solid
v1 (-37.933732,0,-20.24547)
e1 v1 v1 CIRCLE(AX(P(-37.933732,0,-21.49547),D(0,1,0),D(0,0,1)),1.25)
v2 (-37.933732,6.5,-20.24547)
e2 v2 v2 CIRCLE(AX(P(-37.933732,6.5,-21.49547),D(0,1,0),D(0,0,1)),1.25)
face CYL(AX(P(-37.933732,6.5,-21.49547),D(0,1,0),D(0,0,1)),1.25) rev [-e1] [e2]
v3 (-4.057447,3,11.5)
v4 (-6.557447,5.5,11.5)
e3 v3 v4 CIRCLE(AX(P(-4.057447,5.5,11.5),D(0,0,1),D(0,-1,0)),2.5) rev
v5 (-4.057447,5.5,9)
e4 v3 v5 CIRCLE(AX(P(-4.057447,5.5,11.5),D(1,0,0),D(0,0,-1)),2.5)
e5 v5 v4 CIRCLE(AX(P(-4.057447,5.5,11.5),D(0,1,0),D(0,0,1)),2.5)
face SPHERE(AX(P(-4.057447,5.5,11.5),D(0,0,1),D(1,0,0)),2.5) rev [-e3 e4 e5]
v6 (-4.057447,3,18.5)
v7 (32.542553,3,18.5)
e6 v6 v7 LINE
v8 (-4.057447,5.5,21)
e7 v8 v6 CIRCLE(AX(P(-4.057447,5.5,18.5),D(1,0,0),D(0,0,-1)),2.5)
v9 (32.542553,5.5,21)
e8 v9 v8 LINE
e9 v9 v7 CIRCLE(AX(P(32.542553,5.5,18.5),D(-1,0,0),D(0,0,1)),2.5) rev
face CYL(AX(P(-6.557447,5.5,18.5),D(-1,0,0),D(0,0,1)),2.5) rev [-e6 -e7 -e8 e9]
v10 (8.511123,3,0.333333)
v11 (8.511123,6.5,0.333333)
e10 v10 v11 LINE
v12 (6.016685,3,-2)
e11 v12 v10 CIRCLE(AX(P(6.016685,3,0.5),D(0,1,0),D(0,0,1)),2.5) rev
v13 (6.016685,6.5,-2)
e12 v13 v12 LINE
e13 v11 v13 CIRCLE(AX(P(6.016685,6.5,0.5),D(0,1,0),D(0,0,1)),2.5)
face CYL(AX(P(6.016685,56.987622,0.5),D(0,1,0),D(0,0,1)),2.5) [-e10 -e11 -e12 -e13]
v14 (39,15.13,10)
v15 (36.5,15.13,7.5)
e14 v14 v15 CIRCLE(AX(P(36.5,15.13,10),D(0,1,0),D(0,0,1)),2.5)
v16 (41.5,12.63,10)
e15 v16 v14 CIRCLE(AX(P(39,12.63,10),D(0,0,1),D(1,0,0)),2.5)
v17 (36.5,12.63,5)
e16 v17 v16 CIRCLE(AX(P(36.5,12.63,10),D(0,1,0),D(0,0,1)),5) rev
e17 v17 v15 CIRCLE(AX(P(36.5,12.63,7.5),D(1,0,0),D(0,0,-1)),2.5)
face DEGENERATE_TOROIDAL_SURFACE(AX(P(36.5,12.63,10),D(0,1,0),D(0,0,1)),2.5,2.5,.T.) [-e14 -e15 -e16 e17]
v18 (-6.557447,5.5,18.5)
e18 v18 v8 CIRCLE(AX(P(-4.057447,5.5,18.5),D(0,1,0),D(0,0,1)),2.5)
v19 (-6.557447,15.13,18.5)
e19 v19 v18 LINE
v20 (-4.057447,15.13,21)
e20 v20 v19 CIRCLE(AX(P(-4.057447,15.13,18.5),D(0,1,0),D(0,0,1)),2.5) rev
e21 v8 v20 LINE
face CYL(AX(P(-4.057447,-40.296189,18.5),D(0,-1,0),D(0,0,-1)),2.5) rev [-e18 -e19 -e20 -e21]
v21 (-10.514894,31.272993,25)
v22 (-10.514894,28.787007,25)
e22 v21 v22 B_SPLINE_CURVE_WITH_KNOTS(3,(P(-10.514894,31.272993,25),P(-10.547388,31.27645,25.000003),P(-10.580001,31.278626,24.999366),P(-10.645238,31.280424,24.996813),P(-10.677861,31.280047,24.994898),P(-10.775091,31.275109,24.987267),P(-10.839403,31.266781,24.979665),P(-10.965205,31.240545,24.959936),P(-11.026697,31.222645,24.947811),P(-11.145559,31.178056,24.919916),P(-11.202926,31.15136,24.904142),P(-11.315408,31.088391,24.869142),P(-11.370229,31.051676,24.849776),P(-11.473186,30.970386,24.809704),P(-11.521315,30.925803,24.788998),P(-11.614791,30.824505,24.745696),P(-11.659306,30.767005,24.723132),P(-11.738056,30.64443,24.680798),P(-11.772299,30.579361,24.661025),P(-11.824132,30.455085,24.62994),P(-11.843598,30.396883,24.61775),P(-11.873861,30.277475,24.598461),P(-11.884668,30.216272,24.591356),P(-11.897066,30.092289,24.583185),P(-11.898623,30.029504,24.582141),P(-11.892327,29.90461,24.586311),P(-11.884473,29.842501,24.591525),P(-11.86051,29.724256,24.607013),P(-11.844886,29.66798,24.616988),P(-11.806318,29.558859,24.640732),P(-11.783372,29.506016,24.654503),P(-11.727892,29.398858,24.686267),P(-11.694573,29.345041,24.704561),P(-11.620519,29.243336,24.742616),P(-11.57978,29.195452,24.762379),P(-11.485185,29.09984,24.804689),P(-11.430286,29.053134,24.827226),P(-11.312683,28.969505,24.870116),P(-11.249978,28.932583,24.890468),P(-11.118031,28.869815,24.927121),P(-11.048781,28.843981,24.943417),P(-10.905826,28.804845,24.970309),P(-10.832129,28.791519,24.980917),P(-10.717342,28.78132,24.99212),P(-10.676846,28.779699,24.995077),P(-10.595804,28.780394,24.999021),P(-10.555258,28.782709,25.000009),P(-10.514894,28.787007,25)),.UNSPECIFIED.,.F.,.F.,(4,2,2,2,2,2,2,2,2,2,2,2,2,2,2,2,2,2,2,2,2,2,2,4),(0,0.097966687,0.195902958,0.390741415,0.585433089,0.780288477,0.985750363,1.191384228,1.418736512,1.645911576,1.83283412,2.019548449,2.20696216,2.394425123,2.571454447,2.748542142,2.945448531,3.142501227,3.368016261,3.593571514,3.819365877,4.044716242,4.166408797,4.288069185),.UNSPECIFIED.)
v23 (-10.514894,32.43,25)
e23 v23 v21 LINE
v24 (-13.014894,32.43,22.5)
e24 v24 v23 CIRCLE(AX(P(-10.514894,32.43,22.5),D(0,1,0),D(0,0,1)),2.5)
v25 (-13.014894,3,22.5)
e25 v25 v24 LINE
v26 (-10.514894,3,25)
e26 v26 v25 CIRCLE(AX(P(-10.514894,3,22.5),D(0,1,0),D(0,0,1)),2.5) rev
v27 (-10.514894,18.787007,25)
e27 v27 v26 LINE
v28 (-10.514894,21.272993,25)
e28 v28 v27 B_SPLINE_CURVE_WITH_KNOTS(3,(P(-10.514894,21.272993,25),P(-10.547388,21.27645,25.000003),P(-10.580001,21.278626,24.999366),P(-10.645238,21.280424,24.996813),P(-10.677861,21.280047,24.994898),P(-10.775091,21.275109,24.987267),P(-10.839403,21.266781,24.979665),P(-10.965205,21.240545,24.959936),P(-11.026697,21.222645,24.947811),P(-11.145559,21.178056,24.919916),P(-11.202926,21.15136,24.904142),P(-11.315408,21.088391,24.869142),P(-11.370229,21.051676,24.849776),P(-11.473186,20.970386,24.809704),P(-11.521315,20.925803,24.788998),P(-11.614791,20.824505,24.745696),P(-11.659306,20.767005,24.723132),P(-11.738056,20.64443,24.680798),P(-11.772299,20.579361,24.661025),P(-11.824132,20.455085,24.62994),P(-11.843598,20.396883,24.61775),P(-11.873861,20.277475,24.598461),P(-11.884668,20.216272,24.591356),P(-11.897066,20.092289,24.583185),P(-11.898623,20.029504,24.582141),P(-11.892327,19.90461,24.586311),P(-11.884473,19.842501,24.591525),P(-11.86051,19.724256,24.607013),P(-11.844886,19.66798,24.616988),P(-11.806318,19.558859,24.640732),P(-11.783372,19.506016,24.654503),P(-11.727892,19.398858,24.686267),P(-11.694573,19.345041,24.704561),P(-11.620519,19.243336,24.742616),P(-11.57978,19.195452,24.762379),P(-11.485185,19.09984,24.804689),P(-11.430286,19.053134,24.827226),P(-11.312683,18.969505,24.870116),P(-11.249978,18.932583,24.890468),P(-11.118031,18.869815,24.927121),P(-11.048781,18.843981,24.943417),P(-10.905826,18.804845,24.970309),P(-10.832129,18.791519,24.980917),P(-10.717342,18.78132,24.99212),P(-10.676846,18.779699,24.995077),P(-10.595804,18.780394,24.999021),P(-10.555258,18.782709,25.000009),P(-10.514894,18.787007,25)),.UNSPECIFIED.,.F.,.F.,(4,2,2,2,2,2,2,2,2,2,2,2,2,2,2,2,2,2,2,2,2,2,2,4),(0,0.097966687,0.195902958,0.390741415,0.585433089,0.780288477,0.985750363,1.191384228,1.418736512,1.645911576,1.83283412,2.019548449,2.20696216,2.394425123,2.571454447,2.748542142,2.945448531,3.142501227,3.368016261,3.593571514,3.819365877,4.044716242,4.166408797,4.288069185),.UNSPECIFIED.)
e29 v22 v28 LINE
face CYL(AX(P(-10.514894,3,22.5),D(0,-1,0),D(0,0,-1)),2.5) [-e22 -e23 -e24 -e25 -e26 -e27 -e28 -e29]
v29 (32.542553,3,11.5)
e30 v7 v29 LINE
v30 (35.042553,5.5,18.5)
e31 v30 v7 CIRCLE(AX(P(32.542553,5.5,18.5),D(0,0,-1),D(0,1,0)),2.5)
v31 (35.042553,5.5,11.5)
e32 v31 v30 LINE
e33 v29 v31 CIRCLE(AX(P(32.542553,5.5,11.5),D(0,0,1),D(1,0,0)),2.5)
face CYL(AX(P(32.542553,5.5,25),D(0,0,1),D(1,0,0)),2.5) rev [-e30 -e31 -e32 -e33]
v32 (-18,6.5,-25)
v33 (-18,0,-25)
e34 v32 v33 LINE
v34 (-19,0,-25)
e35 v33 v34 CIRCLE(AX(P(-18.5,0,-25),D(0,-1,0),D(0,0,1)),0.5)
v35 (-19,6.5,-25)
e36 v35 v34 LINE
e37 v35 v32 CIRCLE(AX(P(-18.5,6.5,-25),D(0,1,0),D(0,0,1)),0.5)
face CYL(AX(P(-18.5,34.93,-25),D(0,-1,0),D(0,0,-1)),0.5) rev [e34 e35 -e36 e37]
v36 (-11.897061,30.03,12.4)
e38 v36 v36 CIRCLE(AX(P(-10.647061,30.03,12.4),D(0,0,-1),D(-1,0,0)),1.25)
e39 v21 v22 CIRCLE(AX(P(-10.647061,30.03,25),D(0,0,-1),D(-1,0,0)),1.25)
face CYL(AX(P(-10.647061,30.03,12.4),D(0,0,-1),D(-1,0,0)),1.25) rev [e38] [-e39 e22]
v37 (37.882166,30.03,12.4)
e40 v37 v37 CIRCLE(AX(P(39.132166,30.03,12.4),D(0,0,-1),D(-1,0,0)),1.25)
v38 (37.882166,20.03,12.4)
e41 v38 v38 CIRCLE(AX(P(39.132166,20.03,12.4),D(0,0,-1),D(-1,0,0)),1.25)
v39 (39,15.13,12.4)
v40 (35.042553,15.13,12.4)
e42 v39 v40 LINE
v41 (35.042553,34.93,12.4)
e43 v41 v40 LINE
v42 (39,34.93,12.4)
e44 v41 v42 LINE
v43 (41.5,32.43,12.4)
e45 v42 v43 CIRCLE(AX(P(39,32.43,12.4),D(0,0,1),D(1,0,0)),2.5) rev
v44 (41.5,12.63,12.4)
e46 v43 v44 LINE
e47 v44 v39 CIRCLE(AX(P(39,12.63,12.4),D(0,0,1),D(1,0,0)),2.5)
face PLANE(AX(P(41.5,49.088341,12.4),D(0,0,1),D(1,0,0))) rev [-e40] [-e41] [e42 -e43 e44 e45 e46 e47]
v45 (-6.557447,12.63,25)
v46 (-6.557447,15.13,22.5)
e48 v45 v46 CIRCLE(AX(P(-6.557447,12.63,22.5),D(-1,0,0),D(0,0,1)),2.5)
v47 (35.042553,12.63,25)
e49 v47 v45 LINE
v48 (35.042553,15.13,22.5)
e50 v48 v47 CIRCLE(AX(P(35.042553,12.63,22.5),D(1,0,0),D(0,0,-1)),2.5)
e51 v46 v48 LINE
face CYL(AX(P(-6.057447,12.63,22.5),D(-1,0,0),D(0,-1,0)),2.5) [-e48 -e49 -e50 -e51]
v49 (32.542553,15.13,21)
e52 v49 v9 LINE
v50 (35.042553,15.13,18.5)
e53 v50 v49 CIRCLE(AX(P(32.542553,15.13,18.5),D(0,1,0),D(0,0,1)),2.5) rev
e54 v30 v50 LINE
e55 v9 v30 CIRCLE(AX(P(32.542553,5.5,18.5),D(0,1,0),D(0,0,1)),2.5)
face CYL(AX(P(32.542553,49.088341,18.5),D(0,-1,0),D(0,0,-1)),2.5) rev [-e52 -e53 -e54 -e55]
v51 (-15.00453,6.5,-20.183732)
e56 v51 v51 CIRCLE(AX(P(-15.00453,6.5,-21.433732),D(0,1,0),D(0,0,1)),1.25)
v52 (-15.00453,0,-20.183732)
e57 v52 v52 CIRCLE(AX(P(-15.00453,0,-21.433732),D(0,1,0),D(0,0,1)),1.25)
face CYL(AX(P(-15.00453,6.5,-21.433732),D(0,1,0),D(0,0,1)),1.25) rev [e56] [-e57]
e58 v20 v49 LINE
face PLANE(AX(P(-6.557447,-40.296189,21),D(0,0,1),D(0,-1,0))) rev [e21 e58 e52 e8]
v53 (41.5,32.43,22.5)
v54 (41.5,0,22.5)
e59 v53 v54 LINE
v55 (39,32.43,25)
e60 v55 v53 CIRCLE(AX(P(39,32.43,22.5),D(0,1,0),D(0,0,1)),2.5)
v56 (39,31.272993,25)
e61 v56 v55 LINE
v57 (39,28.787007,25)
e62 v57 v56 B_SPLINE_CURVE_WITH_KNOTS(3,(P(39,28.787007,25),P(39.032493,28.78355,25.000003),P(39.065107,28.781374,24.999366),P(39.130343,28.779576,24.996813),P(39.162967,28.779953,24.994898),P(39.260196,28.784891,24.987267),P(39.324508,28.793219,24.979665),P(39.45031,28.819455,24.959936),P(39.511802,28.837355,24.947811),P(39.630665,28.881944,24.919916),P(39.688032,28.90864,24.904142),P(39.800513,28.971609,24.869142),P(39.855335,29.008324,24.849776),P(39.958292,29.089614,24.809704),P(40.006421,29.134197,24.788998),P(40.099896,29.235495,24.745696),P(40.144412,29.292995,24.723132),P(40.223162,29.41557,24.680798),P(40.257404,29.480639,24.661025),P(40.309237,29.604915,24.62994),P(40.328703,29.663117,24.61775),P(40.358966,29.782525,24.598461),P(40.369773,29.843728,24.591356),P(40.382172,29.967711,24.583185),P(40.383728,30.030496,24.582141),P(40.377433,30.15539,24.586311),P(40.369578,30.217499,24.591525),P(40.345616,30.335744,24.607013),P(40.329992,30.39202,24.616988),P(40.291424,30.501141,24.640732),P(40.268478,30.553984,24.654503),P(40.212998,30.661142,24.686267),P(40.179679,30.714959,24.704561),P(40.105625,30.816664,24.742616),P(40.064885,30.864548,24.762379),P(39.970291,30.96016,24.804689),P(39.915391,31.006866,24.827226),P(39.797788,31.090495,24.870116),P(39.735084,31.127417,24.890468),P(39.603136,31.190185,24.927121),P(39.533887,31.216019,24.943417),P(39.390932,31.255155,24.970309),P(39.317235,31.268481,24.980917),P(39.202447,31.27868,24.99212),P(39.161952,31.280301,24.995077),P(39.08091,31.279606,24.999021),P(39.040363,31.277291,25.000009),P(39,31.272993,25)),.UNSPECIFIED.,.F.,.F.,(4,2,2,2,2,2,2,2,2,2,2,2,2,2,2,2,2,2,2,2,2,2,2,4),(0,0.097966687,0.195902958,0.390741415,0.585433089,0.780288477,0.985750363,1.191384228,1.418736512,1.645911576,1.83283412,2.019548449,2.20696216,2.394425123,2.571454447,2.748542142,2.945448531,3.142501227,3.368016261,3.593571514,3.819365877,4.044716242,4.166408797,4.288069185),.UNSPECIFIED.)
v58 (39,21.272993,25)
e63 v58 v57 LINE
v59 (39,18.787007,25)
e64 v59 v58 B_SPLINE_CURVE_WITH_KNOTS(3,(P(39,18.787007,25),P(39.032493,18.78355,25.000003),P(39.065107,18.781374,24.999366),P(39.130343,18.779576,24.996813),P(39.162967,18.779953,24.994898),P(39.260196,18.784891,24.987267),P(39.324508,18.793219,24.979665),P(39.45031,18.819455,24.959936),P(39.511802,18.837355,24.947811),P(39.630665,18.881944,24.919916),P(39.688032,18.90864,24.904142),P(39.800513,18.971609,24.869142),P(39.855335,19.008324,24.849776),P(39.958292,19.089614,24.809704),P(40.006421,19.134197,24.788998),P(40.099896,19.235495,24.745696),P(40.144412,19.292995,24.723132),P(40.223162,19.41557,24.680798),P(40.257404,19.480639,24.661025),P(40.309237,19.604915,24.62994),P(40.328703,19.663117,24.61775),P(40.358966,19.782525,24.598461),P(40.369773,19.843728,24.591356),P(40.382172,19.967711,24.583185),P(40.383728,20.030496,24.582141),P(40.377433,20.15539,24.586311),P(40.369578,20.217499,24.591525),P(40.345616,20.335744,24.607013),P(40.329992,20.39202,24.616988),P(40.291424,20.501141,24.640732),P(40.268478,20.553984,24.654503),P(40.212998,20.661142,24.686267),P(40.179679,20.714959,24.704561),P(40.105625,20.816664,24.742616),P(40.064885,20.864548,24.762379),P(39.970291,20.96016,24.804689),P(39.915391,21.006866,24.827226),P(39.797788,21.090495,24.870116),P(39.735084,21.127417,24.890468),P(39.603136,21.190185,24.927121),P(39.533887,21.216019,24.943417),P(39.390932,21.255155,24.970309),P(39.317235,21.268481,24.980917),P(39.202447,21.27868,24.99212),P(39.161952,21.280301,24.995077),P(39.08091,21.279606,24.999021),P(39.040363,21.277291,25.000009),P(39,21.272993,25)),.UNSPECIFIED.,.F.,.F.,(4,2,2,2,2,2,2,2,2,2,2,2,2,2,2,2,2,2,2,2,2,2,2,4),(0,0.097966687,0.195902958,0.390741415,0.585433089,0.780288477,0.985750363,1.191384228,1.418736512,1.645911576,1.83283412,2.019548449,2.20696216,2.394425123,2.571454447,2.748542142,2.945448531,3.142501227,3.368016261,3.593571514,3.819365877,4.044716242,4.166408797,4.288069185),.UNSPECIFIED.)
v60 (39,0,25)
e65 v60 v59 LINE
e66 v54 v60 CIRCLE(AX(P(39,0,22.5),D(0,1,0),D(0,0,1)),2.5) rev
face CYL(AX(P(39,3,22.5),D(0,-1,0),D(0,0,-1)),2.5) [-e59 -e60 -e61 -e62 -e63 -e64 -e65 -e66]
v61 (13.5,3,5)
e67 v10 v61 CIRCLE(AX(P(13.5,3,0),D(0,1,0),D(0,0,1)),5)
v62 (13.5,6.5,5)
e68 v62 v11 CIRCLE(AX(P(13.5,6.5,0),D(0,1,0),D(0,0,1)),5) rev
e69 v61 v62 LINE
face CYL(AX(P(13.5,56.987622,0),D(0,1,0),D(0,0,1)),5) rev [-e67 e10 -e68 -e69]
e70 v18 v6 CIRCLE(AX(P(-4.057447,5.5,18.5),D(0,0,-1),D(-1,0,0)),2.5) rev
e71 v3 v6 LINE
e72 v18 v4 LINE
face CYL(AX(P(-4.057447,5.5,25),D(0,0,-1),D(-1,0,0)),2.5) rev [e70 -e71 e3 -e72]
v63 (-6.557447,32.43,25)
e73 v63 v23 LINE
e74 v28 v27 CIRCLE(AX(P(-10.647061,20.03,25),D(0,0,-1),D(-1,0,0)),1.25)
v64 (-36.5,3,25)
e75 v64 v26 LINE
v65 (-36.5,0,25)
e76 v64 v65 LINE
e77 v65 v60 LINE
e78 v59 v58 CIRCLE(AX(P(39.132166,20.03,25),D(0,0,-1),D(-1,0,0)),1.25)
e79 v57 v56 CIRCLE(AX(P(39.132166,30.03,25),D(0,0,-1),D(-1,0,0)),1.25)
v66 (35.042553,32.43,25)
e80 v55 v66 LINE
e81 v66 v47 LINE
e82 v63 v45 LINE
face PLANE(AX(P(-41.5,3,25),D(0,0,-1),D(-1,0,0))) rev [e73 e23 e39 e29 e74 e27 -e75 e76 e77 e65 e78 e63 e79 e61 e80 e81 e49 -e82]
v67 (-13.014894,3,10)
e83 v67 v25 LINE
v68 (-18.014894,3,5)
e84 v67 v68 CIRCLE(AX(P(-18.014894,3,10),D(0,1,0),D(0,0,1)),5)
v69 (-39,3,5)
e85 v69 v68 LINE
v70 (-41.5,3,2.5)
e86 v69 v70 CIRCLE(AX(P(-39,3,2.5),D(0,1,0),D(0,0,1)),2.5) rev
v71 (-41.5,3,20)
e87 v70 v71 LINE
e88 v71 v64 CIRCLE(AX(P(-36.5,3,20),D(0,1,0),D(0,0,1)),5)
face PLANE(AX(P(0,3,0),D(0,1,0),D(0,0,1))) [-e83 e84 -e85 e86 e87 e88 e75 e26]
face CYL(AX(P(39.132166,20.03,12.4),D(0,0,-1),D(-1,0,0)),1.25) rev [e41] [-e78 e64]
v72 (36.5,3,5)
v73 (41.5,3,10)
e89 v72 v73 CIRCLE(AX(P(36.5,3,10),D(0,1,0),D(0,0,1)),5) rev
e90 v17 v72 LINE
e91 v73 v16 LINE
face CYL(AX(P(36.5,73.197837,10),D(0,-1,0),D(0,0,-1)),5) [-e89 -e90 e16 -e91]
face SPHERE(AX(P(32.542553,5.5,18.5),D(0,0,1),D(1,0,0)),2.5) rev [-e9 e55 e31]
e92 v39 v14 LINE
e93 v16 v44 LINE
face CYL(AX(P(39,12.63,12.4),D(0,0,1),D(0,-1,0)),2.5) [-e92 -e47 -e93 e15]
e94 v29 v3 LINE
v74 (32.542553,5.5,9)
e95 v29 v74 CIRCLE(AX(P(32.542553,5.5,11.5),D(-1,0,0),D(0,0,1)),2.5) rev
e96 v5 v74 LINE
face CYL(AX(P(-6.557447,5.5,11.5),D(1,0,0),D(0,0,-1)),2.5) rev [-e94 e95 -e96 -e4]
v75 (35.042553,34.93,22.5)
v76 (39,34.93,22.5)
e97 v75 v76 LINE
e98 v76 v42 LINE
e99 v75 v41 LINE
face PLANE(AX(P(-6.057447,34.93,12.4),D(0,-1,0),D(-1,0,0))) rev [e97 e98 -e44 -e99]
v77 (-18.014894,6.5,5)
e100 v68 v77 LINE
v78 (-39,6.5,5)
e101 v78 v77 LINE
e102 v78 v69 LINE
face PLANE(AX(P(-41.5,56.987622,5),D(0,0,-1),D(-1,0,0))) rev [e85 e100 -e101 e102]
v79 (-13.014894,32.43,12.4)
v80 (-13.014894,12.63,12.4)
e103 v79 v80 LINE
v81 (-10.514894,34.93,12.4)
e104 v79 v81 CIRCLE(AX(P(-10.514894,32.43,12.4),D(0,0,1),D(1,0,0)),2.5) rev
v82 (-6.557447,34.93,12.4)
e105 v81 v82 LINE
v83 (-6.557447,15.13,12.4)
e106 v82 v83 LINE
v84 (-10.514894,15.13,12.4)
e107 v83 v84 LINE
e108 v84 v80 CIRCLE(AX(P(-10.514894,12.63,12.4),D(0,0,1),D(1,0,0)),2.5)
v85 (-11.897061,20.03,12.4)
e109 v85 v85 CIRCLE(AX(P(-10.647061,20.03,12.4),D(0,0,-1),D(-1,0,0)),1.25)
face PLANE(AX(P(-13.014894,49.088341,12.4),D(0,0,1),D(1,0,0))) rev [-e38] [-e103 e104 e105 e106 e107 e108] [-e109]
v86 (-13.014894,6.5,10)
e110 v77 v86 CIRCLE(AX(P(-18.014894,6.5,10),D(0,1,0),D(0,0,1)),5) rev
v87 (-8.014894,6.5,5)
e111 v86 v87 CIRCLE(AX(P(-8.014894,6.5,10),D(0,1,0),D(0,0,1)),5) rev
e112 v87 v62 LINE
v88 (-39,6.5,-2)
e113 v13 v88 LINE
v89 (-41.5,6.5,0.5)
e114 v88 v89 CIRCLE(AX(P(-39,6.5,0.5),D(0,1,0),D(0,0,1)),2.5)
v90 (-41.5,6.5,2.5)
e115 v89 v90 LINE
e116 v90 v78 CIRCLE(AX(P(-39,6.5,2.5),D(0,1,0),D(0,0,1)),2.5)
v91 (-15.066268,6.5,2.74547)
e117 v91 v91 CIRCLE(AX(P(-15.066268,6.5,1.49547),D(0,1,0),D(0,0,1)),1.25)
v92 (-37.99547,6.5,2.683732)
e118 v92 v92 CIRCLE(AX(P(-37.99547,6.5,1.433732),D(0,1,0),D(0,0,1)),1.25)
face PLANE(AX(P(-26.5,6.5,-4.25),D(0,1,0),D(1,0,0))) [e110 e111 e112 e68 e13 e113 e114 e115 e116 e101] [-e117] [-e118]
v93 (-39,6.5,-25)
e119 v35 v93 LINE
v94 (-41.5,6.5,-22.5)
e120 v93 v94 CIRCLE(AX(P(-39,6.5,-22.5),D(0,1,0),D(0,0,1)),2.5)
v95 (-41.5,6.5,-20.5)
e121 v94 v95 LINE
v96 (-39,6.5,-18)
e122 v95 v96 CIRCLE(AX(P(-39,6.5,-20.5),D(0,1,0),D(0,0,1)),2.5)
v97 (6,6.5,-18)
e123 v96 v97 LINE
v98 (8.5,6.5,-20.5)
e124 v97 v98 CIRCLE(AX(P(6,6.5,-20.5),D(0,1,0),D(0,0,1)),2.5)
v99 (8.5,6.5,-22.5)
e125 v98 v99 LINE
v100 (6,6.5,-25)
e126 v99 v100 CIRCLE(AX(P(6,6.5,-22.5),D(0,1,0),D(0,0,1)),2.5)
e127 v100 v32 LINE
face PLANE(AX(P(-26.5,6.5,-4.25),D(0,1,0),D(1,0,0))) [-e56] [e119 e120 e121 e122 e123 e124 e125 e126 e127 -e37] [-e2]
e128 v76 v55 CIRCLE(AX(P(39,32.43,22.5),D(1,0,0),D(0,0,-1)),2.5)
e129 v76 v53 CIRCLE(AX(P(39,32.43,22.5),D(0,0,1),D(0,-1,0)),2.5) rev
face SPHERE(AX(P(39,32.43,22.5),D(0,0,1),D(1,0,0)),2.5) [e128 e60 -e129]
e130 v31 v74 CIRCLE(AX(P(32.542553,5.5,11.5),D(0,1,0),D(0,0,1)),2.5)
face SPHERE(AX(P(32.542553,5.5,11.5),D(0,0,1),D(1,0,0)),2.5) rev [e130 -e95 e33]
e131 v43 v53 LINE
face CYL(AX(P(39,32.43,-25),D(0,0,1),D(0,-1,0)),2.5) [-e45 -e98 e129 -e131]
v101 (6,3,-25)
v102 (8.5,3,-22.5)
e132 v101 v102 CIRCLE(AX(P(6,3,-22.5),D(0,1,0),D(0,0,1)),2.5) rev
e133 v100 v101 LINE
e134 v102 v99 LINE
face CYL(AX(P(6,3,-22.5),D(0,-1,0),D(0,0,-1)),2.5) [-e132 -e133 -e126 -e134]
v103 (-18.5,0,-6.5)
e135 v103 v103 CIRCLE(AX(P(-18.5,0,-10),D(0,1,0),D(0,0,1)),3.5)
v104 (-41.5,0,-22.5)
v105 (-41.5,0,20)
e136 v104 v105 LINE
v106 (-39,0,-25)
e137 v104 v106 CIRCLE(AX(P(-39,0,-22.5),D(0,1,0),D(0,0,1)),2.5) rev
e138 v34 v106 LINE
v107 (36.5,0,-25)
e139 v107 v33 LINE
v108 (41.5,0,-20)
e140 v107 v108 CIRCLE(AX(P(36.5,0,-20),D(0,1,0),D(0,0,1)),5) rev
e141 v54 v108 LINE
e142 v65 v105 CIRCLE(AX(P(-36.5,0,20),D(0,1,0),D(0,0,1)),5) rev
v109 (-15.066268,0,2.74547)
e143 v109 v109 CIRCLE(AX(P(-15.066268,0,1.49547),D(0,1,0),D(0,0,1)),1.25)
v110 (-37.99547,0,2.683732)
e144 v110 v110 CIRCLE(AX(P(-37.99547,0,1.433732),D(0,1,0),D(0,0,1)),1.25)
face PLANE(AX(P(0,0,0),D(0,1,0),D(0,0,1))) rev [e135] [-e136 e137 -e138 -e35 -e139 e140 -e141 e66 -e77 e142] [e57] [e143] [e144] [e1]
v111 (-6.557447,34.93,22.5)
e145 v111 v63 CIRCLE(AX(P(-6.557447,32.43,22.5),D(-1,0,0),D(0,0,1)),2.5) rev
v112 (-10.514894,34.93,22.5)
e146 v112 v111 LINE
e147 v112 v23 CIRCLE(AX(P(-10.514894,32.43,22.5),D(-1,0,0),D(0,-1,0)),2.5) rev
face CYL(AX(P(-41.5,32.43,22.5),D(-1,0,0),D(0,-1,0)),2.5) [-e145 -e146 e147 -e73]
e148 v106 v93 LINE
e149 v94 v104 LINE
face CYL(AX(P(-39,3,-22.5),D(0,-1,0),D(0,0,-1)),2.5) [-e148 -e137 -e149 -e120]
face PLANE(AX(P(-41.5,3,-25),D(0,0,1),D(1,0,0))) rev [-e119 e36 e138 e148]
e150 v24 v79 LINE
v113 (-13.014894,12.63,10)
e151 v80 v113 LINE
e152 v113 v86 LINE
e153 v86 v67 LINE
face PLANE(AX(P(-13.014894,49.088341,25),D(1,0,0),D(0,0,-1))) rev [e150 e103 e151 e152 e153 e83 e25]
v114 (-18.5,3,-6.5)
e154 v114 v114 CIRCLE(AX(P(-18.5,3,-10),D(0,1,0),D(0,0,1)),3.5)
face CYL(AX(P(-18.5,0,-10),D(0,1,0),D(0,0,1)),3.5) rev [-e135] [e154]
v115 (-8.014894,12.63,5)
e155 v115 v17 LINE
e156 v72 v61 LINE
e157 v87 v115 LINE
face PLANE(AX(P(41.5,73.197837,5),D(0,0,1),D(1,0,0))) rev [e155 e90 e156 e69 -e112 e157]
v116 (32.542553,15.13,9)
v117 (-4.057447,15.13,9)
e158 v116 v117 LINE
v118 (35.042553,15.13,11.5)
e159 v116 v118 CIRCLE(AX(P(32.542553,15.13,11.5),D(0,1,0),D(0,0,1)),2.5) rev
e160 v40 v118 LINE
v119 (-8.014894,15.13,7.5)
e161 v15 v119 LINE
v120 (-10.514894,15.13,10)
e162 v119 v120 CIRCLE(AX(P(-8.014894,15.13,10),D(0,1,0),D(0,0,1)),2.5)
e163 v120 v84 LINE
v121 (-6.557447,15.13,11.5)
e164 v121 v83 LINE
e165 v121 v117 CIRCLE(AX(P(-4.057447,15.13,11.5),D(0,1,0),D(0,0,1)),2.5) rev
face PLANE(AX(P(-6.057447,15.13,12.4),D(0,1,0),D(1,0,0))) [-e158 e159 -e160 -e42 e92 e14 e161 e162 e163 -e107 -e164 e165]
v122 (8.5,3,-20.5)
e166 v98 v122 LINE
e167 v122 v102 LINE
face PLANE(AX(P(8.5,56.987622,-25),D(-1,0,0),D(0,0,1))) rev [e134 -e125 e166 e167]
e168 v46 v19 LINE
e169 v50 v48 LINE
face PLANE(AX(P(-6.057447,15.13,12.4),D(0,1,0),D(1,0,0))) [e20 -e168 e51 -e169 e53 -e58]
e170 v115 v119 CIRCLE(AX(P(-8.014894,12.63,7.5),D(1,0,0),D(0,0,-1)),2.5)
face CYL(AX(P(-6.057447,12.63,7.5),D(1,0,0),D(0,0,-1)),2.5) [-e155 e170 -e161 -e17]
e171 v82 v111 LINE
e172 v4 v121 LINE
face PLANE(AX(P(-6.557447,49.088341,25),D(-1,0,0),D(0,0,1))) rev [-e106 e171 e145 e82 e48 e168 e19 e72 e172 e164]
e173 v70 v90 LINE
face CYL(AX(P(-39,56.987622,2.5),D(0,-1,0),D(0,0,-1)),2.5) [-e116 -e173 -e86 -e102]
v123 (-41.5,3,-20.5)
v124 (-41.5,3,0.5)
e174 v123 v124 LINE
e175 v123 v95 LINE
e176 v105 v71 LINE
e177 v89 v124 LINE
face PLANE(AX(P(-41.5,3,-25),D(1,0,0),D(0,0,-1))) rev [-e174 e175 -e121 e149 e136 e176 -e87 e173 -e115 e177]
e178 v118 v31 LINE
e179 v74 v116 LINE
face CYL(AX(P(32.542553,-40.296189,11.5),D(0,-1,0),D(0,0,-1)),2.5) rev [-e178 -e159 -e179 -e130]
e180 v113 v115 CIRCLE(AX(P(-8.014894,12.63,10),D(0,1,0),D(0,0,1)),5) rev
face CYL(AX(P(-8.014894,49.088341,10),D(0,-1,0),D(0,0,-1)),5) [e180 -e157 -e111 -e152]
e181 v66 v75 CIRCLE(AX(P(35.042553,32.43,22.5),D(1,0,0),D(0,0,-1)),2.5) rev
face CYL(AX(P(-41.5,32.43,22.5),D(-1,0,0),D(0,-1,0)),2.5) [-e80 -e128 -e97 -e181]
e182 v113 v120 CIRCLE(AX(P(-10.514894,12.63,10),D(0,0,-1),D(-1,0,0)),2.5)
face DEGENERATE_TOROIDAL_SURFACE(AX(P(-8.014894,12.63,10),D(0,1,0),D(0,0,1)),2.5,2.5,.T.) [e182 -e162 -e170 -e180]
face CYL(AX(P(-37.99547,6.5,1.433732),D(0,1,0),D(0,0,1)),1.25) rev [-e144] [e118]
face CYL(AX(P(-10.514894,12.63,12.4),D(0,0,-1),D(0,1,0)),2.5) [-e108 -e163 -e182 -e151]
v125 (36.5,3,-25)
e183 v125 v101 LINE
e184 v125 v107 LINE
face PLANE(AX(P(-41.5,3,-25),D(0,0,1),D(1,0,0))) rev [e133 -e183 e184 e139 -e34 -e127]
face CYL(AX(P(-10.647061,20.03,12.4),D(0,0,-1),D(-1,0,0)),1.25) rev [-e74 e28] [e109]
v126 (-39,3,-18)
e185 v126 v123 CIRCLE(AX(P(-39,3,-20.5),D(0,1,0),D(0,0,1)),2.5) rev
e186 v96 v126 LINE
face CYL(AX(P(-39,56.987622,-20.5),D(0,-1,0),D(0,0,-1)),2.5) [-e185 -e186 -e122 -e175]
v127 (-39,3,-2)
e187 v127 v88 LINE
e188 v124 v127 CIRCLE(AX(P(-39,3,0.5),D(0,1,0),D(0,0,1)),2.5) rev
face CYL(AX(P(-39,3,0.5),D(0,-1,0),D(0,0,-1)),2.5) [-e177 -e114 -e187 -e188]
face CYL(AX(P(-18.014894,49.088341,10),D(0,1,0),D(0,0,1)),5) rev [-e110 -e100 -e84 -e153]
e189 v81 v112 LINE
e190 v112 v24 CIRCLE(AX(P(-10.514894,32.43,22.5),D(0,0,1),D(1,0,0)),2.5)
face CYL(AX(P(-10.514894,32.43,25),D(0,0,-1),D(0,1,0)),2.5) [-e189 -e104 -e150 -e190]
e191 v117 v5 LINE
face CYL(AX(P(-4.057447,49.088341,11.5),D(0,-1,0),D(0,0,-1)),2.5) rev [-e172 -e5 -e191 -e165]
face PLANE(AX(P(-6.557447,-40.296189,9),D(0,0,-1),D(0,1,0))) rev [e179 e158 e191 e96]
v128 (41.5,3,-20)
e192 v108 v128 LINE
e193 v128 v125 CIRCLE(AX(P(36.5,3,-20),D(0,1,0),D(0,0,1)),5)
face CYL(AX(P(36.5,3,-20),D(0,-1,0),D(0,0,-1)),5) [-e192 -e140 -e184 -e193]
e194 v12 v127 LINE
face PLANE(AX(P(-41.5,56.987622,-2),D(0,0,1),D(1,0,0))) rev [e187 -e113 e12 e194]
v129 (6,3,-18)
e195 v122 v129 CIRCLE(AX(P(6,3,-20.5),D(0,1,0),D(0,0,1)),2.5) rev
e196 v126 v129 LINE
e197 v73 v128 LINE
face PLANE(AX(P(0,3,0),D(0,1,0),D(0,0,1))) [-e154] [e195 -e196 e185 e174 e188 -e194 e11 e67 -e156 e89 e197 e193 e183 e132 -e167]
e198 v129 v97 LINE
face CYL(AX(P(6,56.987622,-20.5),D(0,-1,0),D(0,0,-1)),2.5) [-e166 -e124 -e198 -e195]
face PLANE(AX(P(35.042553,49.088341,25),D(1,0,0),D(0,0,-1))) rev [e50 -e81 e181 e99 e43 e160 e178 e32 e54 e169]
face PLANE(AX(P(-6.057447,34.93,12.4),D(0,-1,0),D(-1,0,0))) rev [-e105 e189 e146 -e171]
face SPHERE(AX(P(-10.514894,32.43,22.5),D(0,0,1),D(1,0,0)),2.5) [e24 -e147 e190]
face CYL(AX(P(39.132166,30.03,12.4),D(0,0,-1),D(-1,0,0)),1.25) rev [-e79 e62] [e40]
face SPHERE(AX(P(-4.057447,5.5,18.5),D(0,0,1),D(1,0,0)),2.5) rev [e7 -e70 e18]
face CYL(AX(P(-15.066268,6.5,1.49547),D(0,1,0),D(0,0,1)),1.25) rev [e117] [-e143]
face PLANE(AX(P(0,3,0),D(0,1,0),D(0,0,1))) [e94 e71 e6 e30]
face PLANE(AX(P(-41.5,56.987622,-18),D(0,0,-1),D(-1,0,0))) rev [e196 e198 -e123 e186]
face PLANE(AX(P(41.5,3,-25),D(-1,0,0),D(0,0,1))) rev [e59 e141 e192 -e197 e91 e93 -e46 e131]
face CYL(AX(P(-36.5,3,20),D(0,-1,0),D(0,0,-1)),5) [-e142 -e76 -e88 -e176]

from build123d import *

# Parameters (mm, degrees)
SKETCH1_W             = 83
SKETCH1_H             = 50
BOSS_EXTRUDE1_DEPTH   = 3
SKETCH2_W             = 50
SKETCH2_H             = 7
BOSS_EXTRUDE2_DEPTH   = 3.5
SKETCH3_W             = 6.457447236
SKETCH3_H             = 12.6
BOSS_EXTRUDE3_DEPTH   = 31.93
M3X0_5_TAPPED_HOLE1_D = 2.5
SKETCH6_W             = 54.514894472
SKETCH6_H             = 20
BOSS_EXTRUDE4_DEPTH   = 12.13
SKETCH10_W            = 41.6
SKETCH10_H            = 12
CUT_EXTRUDE2_DEPTH    = 12.13
FILLET1_R             = 5
FILLET2_R             = 5
FILLET3_R             = 2.5
FILLET4_R             = 2.5
FILLET5_R             = 2.5
M3X0_5_TAPPED_HOLE2_D = 2.5
SKETCH9_R             = 3.5
CUT_EXTRUDE1_DEPTH    = 59.023916735
FILLET6_R             = 2.5
CUT_EXTRUDE3_DEPTH    = 60.727338073


with BuildPart() as part:
    # Sketch1 → Boss-Extrude1 (new body)
    with BuildSketch(Plane(origin=(0, 0, 0), x_dir=(1, 0, 0), z_dir=(0, 1, 0))):
        Rectangle(SKETCH1_W, SKETCH1_H)
    extrude(amount=BOSS_EXTRUDE1_DEPTH)

    # Sketch2 → Boss-Extrude2 (add)
    with BuildSketch(Plane(origin=(0, 3, 0), x_dir=(1, 0, 0), z_dir=(0, 1, 0))):
        with Locations((-16.5, 21.5)):
            Rectangle(SKETCH2_W, SKETCH2_H)
        with Locations((-16.5, -1.5)):
            Rectangle(SKETCH2_W, SKETCH2_H)
    extrude(amount=BOSS_EXTRUDE2_DEPTH)

    # Sketch3 → Boss-Extrude3 (add)
    with BuildSketch(Plane(origin=(0, 3, 0), x_dir=(1, 0, 0), z_dir=(0, 1, 0))):
        with Locations((38.271276382, -18.7)):
            Rectangle(SKETCH3_W, SKETCH3_H)
        with Locations((-9.786170854, -18.7)):
            Rectangle(SKETCH3_W, SKETCH3_H)
    extrude(amount=BOSS_EXTRUDE3_DEPTH)

    # M3x0.5 Tapped Hole1 (through all)
    with Locations(Plane(origin=(0, 0, 12.4), x_dir=(-1, 0, 0), z_dir=(0, 0, -1))):
        with Locations((-39.132166065, 30.03), (-39.132166065, 20.03), (10.647060537, 20.03), (10.647060537, 30.03)):
            Hole(M3X0_5_TAPPED_HOLE1_D / 2)

    # Sketch6 → Boss-Extrude4 (add)
    with BuildSketch(Plane(origin=(0, 3, 0), x_dir=(1, 0, 0), z_dir=(0, 1, 0))):
        with Locations((14.242552764, -15)):
            Rectangle(SKETCH6_W, SKETCH6_H)
    extrude(amount=BOSS_EXTRUDE4_DEPTH)

    # Sketch10 → Cut-Extrude2 (cut)
    with BuildSketch(Plane(origin=(0, 15.13, 0), x_dir=(1, 0, 0), z_dir=(0, 1, 0))):
        with Locations((14.242552764, -15)):
            Rectangle(SKETCH10_W, SKETCH10_H)
    extrude(amount=-CUT_EXTRUDE2_DEPTH, mode=Mode.SUBTRACT)

    # Fillet1
    fillet1_edges = [part.edges().sort_by_distance(p)[0] for p in [
        (8.5, 4.75, 5),
        (41.5, 9.065, 5),
        (-13.014894472, 4.75, 5),
    ]]
    fillet(fillet1_edges, radius=FILLET1_R)

    # Fillet2
    fillet2_edges = [part.edges().sort_by_distance(p)[0] for p in [
        (-13.014894472, 10.815, 5),
        (-41.5, 1.5, 25),
        (41.5, 1.5, -25),
    ]]
    fillet(fillet2_edges, radius=FILLET2_R)

    # Fillet3
    fillet3_edges = [part.edges().sort_by_distance(p)[0] for p in [
        (8.5, 4.75, -18),
        (-41.5, 4.75, -18),
        (-41.5, 4.75, -2),
        (8.5, 4.75, -2),
        (8.5, 4.75, -25),
        (-41.5, 4.75, 5),
        (-41.5, 3.25, -25),
    ]]
    fillet(fillet3_edges, radius=FILLET3_R)

    # Fillet4
    fillet4_edges = [part.edges().sort_by_distance(p)[0] for p in [
        (14.242552764, 15.13, 5),
        (40.035533906, 15.13, 6.464466094),
        (-13.014894472, 15.13, 11.2),
        (-11.550428378, 15.13, 6.464466094),
        (41.5, 15.13, 11.2),
        (14.242552764, 15.13, 25),
    ]]
    fillet(fillet4_edges, radius=FILLET4_R)

    # Fillet5
    # the kernel refuses this fillet: 2.5 mm, written as the material it takes off along each edge
    with BuildSketch(Plane(origin=(39, 32.43, 22.5), x_dir=(1, 0, 0), z_dir=(0, 0, 1))) as fillet5_piece_1_section:
        Polygon((0, 0), (FILLET5_R * 1.02, 0), (FILLET5_R * 1.02, FILLET5_R * 1.02), (0, FILLET5_R * 1.02), align=None)
    fillet5_piece_1 = extrude(amount=FILLET5_R * 1.02, mode=Mode.PRIVATE)
    fillet5_piece_1 = fillet5_piece_1 - Plane(origin=(39, 32.43, 22.5), x_dir=(-0.7071067811865475, -0.7071067811865475, 0), z_dir=(0, 0, 1)) * Sphere(FILLET5_R, mode=Mode.PRIVATE)
    add(fillet5_piece_1, mode=Mode.SUBTRACT)
    with BuildSketch(Plane(origin=(-10.514894472, 32.43, 22.5), x_dir=(-1, 0, 0), z_dir=(0, 0, 1))) as fillet5_piece_2_section:
        Polygon((0, 0), (FILLET5_R * 1.02, 0), (FILLET5_R * 1.02, -FILLET5_R * 1.02), (0, -FILLET5_R * 1.02), align=None)
    fillet5_piece_2 = extrude(amount=FILLET5_R * 1.02, mode=Mode.PRIVATE)
    fillet5_piece_2 = fillet5_piece_2 - Plane(origin=(-10.514894472, 32.43, 22.5), x_dir=(0.7071067811865475, -0.7071067811865475, 0), z_dir=(0, 0, 1)) * Sphere(FILLET5_R, mode=Mode.PRIVATE)
    add(fillet5_piece_2, mode=Mode.SUBTRACT)
    with BuildSketch(Plane(origin=(39, 34.93, 25), x_dir=(0, -1, 0), z_dir=(-1, 0, 0))) as fillet5_piece_3:
        with BuildLine():
            CenterArc((FILLET5_R, -FILLET5_R), FILLET5_R, 90, 90)
            Line((0, -FILLET5_R), (0, 0))
            Line((0, 0), (FILLET5_R, 0))
        make_face()
    extrude(amount=10.207447236, mode=Mode.SUBTRACT)
    with BuildSketch(Plane(origin=(41.5, 34.93, 6.15), x_dir=(-1, 0, 0), z_dir=(0, 0, 1)), Plane(origin=(-13.014894472, 34.93, 6.15), x_dir=(0, -1, 0), z_dir=(0, 0, 1))) as fillet5_piece_4:
        with BuildLine():
            CenterArc((FILLET5_R, FILLET5_R), FILLET5_R, 180, 90)
            Line((0, FILLET5_R), (0, 0))
            Line((0, 0), (FILLET5_R, 0))
        make_face()
    extrude(amount=16.35, mode=Mode.SUBTRACT)
    with BuildSketch(Plane(origin=(-10.514894472, 34.93, 25), x_dir=(0, -1, 0), z_dir=(1, 0, 0))) as fillet5_piece_5:
        with BuildLine():
            CenterArc((FILLET5_R, FILLET5_R), FILLET5_R, 180, 90)
            Line((0, FILLET5_R), (0, 0))
            Line((0, 0), (FILLET5_R, 0))
        make_face()
    extrude(amount=10.207447236, mode=Mode.SUBTRACT)
    with BuildSketch(Plane(origin=(-13.014894472, 32.43, 25), x_dir=(1, 0, 0), z_dir=(0, -1, 0))) as fillet5_piece_6:
        with BuildLine():
            CenterArc((FILLET5_R, -FILLET5_R), FILLET5_R, 90, 90)
            Line((0, -FILLET5_R), (0, 0))
            Line((0, 0), (FILLET5_R, 0))
        make_face()
    extrude(amount=29.43, mode=Mode.SUBTRACT)
    with BuildSketch(Plane(origin=(41.5, 32.43, 25), x_dir=(-1, 0, 0), z_dir=(0, -1, 0))) as fillet5_piece_7:
        with BuildLine():
            CenterArc((FILLET5_R, FILLET5_R), FILLET5_R, 180, 90)
            Line((0, FILLET5_R), (0, 0))
            Line((0, 0), (FILLET5_R, 0))
        make_face()
    extrude(amount=38.68, mode=Mode.SUBTRACT)

    # M3x0.5 Tapped Hole2 (through all)
    with Locations(Plane(origin=(0, 6.5, 0), x_dir=(1, 0, 0), z_dir=(0, 1, 0))):
        with Locations((-37.99546971, -1.433732), (-15.066268, -1.49546971), (-15.00453029, 21.433732), (-37.933732, 21.49546971)):
            Hole(M3X0_5_TAPPED_HOLE2_D / 2)

    # Sketch9 → Cut-Extrude1 (cut, through all)
    with BuildSketch(Plane(origin=(0, 3, 0), x_dir=(1, 0, 0), z_dir=(0, 1, 0))):
        with Locations(Location((-18.5, 10, 0), (0, 0, 270))):
            Circle(SKETCH9_R)
    extrude(amount=-CUT_EXTRUDE1_DEPTH, mode=Mode.SUBTRACT)

    # Fillet6
    fillet6_edges = [part.edges().sort_by_distance(p)[0] for p in [
        (-6.557447236, 9.065, 21),
        (-6.557447236, 9.065, 9),
        (35.042552764, 9.065, 9),
        (35.042552764, 9.065, 21),
        (-6.557447236, 3, 15),
        (14.242552764, 3, 9),
        (35.042552764, 3, 15),
        (14.242552764, 3, 21),
    ]]
    fillet(fillet6_edges, radius=FILLET6_R)

    # Sketch11 → Cut-Extrude3 (cut, through all)
    with BuildSketch(Plane.XZ):
        with BuildLine():
            Line((-19, -25), (-18, -25))
            ThreePointArc((-18, -25), (-18.5, -24.5), (-19, -25))
        make_face()
    extrude(amount=-CUT_EXTRUDE3_DEPTH, mode=Mode.SUBTRACT)


solid = part.part
